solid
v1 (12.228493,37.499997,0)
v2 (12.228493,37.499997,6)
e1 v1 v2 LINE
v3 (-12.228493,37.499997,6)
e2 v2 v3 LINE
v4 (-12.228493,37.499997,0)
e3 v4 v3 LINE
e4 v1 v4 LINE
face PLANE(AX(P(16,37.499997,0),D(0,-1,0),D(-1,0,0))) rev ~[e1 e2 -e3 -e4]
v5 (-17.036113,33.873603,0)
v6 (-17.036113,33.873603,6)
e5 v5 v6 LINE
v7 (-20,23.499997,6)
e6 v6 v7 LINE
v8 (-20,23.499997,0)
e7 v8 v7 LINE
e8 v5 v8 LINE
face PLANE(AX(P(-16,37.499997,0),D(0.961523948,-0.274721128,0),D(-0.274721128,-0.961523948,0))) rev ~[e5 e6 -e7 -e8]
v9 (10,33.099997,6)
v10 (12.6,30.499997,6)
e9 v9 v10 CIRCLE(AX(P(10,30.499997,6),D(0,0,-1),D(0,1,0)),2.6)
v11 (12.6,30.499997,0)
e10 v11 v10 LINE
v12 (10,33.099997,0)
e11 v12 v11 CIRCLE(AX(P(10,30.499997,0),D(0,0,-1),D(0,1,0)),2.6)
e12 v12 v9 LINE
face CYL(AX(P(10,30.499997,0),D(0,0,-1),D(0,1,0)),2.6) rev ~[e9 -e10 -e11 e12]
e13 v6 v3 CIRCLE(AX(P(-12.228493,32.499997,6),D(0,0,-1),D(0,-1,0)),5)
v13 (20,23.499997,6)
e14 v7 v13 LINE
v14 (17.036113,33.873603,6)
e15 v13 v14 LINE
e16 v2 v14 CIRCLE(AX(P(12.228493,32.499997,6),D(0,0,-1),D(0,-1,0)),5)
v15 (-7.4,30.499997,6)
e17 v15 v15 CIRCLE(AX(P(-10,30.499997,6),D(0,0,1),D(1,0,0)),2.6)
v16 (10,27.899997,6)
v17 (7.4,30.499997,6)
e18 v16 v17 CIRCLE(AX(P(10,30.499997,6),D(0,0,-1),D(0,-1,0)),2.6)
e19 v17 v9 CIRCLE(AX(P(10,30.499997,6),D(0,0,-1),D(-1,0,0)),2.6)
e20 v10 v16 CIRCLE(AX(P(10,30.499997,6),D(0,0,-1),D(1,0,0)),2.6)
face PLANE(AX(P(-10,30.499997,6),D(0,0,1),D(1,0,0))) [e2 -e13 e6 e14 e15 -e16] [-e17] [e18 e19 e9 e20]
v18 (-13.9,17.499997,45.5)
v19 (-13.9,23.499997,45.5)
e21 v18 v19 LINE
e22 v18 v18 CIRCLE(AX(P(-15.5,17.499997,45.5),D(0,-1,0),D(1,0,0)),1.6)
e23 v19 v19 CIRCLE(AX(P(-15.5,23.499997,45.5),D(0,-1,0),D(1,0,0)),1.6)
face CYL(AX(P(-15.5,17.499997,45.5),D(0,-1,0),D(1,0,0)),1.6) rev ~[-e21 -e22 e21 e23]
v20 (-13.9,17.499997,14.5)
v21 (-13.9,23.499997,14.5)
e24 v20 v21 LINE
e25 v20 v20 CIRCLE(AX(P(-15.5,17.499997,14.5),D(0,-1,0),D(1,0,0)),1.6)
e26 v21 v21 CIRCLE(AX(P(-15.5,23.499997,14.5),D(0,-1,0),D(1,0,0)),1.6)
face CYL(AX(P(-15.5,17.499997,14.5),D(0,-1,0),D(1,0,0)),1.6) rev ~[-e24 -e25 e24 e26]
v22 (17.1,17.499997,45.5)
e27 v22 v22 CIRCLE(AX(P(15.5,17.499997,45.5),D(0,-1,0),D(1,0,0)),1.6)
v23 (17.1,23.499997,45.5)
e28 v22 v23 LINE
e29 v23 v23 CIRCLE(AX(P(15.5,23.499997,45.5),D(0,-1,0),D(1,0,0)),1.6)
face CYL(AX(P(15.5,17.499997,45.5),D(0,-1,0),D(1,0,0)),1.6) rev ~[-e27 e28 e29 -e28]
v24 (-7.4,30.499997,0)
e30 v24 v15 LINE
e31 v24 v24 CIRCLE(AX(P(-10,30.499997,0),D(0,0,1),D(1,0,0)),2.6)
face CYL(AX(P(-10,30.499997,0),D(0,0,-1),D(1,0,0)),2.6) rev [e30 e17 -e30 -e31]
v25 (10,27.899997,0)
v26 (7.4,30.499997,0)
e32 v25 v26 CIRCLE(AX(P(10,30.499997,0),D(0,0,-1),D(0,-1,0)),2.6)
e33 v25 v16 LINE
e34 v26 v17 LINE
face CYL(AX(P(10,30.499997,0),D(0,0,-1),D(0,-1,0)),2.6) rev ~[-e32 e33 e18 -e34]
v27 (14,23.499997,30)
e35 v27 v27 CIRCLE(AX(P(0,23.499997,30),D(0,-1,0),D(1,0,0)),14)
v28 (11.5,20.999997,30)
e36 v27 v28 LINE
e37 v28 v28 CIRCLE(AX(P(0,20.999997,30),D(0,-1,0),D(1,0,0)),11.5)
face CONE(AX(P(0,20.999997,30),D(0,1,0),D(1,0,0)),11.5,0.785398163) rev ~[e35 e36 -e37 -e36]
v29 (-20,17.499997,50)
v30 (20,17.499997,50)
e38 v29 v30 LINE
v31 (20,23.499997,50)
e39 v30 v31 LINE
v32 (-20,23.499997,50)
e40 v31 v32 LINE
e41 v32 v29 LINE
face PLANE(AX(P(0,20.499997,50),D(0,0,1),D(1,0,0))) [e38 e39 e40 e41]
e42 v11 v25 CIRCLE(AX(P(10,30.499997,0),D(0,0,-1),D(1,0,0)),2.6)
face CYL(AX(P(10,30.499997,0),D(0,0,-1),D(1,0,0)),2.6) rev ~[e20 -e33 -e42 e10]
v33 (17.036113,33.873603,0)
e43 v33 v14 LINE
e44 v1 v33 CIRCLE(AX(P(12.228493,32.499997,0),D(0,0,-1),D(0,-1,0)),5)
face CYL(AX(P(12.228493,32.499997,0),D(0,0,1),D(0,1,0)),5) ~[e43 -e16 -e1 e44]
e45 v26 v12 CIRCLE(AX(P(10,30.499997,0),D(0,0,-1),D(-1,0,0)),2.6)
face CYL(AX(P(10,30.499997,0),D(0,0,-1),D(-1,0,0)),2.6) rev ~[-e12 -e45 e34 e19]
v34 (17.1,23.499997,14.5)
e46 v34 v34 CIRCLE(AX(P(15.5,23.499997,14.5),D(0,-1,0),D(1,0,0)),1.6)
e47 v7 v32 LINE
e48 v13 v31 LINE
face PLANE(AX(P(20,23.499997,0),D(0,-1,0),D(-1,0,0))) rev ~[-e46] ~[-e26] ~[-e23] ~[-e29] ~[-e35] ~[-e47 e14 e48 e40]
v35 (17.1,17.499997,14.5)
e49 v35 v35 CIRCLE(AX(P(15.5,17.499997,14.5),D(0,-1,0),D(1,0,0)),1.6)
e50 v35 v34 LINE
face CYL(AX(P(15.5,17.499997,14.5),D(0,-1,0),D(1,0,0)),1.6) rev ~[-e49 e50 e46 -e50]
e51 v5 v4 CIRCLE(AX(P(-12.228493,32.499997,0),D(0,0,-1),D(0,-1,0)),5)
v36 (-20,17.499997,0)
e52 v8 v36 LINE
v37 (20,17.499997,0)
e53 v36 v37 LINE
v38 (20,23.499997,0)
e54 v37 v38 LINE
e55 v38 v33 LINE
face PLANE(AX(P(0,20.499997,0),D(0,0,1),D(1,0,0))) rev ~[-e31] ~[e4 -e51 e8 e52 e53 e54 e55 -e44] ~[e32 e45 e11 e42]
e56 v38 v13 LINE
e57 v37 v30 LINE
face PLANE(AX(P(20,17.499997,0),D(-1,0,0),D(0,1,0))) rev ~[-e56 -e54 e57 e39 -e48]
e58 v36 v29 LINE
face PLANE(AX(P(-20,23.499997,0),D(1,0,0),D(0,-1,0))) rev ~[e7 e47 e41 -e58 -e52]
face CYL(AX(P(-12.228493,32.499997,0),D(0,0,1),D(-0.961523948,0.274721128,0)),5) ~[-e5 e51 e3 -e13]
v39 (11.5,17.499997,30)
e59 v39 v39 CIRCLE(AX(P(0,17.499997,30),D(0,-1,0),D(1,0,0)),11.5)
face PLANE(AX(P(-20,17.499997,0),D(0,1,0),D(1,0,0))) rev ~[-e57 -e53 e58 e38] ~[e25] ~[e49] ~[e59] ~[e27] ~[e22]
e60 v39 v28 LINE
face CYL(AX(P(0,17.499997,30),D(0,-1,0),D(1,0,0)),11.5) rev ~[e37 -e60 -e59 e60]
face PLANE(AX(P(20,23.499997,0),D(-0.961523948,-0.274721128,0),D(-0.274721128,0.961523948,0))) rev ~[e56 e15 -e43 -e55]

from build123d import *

# Parameters (mm, degrees)
F1_W     = 12
F1_H     = 14
F1_R     = 2.6
F2_DEPTH = 6
F3_DEPTH = 50
F4_R     = 11.5
F4_R_2   = 1.6
F5_DEPTH = 20.001
F7_R     = 5
F8_SIZE  = 2.5


with BuildPart() as f2:
    # F1 (on Top) → F2 (new body)
    with BuildSketch(Plane.XY):
        with Locations((-10, 30.4999971617)):
            Rectangle(F1_W, F1_H)
        with Locations((-10, 30.4999971617)):
            Circle(F1_R, mode=Mode.SUBTRACT)
        with BuildLine():
            Line((10, 33.0999971617), (10, 37.4999971617))
            Line((10, 37.4999971617), (4, 37.4999971617))
            Line((4, 37.4999971617), (4, 30.4999971617))
            Line((4, 30.4999971617), (7.4, 30.4999971617))
            ThreePointArc((7.4, 30.4999971617), (8.1615223689, 32.3384747928), (10, 33.0999971617))
        make_face()
        with BuildLine():
            Line((16, 30.4999971617), (16, 37.4999971617))
            Line((16, 37.4999971617), (10, 37.4999971617))
            Line((10, 37.4999971617), (10, 33.0999971617))
            ThreePointArc((10, 33.0999971617), (11.8384776311, 32.3384747928), (12.6, 30.4999971617))
            Line((12.6, 30.4999971617), (16, 30.4999971617))
        make_face()
        with BuildLine():
            Line((10, 23.4999971617), (16, 23.4999971617))
            Line((16, 23.4999971617), (16, 30.4999971617))
            Line((16, 30.4999971617), (12.6, 30.4999971617))
            ThreePointArc((12.6, 30.4999971617), (11.8384776311, 28.6615195306), (10, 27.8999971617))
            Line((10, 27.8999971617), (10, 23.4999971617))
        make_face()
        with BuildLine():
            Line((4, 23.4999971617), (10, 23.4999971617))
            Line((10, 23.4999971617), (10, 27.8999971617))
            ThreePointArc((10, 27.8999971617), (8.1615223689, 28.6615195306), (7.4, 30.4999971617))
            Line((7.4, 30.4999971617), (4, 30.4999971617))
            Line((4, 30.4999971617), (4, 23.4999971617))
        make_face()
        Polygon((-16, 37.4999971617), (-20, 23.4999971617), (-16, 23.4999971617), align=None)
        Polygon((-4, 37.4999971617), (-4, 23.4999971617), (4, 23.4999971617), (4, 30.4999971617), (4, 37.4999971617), align=None)
        Polygon((16, 23.4999971617), (20, 23.4999971617), (16, 37.4999971617), (16, 30.4999971617), align=None)
    extrude(amount=F2_DEPTH)

    # F1 (on Top) → F3 (join)
    with BuildSketch(Plane.XY):
        Polygon((-20, 23.4999971617), (-20, 17.4999971617), (20, 17.4999971617), (20, 23.4999971617), (16, 23.4999971617), (10, 23.4999971617), (4, 23.4999971617), (-4, 23.4999971617), (-16, 23.4999971617), align=None)
    extrude(amount=F3_DEPTH)

    # F4 (on face) → F5 (cut, through all)
    with BuildSketch(Plane.XZ.offset(-17.4999971617)):
        with Locations((0, 30)):
            Circle(F4_R)
        with Locations((-15.5, 45.5)):
            Circle(F4_R_2)
        with Locations((-15.5, 14.5)):
            Circle(F4_R_2)
        with Locations((15.5, 14.5)):
            Circle(F4_R_2)
        with Locations((15.5, 45.5)):
            Circle(F4_R_2)
    extrude(amount=-F5_DEPTH, mode=Mode.SUBTRACT)

    # F7
    f7_edges = [f2.edges().sort_by_distance(p)[0] for p in [
        (16, 37.499997, 3),
        (-16, 37.499997, 3),
    ]]
    fillet(f7_edges, radius=F7_R)

    # F8
    f8_edges = [f2.edges().sort_by_distance(p)[0] for p in [
        (-11.5, 23.499997, 30),
    ]]
    chamfer(f8_edges, length=F8_SIZE)


solid = f2.part
